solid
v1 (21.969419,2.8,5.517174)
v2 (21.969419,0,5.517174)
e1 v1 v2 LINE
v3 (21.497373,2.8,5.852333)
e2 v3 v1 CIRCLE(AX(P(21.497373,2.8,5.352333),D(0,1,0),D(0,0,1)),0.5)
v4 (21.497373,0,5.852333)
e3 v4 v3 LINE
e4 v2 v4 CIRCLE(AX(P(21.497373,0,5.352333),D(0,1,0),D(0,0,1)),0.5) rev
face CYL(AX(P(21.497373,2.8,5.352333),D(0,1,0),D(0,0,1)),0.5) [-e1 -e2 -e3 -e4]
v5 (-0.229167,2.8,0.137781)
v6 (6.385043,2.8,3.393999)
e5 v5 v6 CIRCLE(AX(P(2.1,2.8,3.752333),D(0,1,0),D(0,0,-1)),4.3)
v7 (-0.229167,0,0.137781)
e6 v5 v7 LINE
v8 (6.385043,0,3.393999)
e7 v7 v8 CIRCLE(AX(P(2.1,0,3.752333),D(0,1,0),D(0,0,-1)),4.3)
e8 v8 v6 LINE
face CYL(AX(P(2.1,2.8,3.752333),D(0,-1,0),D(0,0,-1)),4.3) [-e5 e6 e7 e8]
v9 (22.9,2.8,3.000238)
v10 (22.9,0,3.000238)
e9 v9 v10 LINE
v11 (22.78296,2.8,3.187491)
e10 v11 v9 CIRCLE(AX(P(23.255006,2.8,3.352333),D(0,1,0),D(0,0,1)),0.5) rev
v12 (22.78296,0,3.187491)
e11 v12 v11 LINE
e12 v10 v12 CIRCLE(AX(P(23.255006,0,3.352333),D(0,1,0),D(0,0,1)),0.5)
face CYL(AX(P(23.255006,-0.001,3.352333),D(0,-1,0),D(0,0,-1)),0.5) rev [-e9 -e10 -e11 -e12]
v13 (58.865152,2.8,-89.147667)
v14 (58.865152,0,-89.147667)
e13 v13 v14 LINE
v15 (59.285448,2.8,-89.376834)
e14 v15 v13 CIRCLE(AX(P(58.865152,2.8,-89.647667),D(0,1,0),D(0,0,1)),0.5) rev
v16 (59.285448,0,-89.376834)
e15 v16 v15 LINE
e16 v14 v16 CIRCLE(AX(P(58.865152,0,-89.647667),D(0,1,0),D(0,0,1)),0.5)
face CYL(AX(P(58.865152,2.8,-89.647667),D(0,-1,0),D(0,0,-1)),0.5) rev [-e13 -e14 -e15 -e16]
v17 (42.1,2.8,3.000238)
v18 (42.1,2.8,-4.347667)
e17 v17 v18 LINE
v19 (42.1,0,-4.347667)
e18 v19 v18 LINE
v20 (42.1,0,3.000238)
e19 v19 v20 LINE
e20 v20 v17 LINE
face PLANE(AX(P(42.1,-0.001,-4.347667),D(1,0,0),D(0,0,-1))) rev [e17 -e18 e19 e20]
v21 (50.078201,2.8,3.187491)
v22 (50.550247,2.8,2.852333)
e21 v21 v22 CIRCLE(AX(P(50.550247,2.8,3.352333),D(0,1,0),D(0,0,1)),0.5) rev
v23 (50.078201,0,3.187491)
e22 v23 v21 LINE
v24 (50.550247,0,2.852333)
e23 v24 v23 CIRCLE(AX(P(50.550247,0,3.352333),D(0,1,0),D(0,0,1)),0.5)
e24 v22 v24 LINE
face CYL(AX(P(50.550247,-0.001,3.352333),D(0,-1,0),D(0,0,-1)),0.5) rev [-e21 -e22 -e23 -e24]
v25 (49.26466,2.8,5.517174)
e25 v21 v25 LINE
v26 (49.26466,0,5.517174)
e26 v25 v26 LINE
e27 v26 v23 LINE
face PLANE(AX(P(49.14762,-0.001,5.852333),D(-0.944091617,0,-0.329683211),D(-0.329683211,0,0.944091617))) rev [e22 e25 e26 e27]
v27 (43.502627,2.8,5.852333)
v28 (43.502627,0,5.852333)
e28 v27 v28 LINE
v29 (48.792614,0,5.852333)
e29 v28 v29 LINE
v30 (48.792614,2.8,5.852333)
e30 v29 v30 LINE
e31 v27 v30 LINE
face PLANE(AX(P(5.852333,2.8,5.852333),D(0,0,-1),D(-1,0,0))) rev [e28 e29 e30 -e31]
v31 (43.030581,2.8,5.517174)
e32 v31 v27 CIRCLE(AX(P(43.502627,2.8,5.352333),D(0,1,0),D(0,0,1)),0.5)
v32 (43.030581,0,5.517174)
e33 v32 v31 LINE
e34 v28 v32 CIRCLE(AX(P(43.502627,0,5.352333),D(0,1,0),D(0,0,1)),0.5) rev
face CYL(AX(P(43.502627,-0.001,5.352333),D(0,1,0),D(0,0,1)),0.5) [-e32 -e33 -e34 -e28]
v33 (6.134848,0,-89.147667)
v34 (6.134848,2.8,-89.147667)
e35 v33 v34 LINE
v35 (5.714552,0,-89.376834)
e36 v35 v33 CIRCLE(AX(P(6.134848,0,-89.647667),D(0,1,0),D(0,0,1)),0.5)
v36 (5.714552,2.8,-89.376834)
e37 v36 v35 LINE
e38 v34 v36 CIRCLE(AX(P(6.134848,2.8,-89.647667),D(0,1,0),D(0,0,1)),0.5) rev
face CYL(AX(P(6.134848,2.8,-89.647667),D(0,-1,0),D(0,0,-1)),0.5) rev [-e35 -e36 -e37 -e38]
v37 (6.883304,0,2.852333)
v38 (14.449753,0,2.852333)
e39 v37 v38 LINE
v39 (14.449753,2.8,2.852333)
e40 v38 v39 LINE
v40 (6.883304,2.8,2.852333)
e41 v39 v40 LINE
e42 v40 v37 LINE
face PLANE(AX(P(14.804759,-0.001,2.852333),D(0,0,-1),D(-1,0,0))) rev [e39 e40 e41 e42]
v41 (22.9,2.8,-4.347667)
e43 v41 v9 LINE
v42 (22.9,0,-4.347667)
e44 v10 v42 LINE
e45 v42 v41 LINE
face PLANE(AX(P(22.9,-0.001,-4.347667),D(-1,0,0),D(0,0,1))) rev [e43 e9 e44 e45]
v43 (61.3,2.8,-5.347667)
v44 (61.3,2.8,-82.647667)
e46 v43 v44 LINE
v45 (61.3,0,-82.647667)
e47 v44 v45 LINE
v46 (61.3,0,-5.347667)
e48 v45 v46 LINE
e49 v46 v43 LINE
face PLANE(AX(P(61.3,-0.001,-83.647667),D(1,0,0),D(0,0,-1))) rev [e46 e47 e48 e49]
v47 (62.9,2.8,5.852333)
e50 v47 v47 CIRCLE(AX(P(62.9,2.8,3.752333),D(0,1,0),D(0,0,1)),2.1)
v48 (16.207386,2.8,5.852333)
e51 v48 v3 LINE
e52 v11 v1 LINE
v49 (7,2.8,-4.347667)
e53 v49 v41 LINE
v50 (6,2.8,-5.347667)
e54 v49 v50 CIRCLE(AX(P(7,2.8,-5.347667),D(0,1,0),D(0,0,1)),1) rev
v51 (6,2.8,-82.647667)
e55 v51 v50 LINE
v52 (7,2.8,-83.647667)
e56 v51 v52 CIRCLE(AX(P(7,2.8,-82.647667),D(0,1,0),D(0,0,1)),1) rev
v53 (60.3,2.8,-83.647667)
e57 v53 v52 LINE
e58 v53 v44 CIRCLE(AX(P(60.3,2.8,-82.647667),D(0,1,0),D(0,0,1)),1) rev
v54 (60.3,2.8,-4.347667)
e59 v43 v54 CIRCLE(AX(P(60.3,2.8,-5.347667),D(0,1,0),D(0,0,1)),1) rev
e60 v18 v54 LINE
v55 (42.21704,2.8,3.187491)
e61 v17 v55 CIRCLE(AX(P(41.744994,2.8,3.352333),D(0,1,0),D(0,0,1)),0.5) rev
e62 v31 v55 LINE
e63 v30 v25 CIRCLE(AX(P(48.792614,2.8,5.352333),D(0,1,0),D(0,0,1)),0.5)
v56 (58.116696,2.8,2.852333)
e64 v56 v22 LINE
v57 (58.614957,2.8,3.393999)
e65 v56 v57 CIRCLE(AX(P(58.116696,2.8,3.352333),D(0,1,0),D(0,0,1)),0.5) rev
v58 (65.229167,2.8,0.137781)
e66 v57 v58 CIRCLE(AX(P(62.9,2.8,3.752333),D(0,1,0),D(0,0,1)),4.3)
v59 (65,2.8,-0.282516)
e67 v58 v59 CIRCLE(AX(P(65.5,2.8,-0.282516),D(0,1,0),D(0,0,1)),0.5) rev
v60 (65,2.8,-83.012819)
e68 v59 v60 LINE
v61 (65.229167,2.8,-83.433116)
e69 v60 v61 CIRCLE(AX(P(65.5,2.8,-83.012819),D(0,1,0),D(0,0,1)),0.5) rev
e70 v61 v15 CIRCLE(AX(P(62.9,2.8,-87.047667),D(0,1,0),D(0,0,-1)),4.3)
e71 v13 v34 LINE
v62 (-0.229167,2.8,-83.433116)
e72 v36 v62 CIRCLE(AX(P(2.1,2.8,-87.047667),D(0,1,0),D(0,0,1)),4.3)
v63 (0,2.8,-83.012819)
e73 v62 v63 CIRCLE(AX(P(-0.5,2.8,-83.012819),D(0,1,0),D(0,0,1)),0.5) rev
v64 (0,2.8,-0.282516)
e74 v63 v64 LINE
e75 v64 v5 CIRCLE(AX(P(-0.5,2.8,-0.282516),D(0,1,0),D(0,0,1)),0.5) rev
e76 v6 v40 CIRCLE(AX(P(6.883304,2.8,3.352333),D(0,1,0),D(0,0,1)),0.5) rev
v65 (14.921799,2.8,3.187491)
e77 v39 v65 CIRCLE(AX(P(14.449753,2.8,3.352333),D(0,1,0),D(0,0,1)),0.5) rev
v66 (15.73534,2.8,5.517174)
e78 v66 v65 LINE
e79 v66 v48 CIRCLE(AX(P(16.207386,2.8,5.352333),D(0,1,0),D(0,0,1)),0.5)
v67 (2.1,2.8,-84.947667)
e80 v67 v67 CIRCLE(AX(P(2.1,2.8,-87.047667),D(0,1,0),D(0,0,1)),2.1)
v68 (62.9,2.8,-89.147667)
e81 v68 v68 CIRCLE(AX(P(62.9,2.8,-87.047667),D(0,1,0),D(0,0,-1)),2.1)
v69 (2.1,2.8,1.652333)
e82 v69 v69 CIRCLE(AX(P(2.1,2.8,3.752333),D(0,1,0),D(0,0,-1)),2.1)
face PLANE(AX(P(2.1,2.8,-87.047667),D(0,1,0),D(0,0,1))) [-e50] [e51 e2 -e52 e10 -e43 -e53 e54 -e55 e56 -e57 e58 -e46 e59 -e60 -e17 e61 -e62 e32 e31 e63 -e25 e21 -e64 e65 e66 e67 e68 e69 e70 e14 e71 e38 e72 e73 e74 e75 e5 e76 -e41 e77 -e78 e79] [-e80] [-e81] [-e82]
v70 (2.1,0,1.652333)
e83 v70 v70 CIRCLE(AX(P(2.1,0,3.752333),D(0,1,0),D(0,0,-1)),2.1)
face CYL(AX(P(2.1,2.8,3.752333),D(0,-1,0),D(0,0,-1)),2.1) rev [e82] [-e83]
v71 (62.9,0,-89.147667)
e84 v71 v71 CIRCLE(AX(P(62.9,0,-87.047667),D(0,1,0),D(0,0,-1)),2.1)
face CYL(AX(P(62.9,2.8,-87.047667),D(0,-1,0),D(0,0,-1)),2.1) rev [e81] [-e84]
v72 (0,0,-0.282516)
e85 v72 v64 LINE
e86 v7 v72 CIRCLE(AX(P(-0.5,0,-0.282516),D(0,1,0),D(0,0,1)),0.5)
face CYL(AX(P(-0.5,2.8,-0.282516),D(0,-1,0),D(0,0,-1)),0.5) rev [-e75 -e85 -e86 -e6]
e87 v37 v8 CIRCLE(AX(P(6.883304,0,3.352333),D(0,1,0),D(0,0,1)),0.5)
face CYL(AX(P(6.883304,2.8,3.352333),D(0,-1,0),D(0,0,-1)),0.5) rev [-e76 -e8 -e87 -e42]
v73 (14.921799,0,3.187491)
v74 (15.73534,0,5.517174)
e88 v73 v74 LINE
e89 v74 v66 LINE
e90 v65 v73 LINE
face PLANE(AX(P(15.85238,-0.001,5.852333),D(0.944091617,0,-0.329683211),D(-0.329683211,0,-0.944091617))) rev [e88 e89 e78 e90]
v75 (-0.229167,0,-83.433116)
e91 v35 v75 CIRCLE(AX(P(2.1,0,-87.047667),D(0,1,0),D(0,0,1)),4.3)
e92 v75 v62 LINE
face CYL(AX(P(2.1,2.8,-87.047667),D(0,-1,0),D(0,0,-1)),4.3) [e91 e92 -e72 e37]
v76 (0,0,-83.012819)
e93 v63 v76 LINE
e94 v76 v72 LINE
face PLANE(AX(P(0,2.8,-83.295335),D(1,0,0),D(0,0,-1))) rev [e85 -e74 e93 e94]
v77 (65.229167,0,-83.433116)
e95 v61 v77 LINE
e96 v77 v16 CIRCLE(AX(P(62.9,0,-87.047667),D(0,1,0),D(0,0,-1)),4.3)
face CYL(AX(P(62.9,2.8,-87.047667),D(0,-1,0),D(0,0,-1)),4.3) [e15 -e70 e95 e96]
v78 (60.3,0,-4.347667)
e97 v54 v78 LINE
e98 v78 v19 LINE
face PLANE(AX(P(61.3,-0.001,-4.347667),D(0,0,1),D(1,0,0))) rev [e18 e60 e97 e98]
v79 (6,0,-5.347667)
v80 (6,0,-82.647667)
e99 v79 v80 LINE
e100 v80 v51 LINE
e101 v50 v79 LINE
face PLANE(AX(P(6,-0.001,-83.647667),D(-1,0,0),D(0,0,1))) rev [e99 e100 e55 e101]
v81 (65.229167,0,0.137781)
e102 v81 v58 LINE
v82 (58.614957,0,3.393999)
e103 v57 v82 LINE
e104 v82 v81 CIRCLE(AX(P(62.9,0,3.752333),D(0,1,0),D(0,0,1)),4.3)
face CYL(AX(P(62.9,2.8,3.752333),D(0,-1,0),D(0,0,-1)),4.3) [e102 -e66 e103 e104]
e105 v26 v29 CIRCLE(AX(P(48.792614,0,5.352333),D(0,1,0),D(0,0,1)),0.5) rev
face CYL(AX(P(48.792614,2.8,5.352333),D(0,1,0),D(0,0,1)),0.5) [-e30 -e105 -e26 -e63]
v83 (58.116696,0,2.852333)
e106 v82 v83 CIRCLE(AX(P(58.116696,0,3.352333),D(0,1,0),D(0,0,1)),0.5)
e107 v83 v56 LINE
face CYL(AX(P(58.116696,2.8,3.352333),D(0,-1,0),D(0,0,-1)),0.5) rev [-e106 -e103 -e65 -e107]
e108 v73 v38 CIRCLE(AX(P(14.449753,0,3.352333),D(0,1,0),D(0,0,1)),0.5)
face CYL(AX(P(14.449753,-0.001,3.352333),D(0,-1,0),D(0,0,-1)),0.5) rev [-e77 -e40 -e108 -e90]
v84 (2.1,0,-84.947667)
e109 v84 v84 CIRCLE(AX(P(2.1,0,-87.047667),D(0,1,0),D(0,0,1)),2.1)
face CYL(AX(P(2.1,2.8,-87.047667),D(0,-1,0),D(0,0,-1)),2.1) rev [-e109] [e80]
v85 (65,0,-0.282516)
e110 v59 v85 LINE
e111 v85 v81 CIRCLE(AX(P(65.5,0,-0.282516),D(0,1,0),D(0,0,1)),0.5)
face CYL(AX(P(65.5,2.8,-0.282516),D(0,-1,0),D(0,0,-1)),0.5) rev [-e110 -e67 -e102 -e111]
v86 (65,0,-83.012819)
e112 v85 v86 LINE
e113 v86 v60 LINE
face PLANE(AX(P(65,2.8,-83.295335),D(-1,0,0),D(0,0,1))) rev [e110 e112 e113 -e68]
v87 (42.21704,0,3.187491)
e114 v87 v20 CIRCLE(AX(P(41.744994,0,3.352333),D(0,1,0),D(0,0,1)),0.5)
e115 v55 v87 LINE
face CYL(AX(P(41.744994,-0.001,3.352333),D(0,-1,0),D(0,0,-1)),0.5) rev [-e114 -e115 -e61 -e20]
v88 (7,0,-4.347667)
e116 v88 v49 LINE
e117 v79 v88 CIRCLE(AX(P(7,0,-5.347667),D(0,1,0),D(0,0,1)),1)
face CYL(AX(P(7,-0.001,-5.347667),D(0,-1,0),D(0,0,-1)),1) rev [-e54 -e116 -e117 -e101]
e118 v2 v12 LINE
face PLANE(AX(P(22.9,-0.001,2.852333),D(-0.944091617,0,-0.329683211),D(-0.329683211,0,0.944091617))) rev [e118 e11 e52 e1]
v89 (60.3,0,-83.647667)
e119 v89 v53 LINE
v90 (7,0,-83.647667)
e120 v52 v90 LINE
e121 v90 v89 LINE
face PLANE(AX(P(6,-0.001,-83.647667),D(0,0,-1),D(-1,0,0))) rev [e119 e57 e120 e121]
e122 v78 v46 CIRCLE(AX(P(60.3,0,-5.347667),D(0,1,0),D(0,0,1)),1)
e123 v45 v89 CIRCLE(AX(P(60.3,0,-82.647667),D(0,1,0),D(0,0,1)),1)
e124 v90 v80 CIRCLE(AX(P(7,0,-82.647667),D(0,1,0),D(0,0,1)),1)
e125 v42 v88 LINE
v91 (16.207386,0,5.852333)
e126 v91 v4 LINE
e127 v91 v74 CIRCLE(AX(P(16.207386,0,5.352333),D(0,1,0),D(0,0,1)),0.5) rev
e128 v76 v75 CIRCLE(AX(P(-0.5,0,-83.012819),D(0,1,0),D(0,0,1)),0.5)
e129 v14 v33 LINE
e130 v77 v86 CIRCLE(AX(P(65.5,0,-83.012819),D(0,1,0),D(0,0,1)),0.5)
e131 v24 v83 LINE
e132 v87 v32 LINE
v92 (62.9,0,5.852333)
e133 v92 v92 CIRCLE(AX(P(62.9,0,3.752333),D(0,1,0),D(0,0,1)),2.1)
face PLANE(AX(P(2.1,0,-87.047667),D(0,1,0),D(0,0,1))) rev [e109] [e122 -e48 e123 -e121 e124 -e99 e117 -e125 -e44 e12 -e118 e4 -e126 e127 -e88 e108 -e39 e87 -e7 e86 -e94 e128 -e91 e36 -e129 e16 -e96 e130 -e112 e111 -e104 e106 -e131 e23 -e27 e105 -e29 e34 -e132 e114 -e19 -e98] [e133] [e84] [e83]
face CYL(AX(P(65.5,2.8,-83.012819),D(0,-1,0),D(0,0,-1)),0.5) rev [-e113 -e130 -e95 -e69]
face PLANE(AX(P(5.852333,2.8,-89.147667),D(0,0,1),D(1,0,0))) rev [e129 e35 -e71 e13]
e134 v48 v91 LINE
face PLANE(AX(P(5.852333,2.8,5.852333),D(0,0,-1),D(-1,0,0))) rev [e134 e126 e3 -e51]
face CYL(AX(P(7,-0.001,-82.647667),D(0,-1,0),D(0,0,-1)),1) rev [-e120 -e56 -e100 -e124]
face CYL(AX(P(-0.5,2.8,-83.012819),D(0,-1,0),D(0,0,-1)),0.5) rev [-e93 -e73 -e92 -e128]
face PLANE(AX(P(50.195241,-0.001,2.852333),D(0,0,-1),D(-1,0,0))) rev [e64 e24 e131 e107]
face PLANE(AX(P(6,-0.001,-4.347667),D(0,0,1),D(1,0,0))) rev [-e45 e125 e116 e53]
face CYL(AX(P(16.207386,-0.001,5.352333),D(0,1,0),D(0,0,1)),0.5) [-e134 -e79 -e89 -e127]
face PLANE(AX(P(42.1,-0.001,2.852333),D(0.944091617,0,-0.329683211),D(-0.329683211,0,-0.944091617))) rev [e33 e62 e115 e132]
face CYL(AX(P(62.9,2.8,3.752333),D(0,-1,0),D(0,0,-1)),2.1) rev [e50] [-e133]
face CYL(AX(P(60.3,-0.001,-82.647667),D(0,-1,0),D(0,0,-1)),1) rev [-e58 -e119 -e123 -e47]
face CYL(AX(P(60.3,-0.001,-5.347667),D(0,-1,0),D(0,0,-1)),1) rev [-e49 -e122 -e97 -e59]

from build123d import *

# Parameters (mm, degrees)
BASEPLATE_OUTLINE_R = 2.1
BASEPLATE_DEPTH     = 2.8
CUT_EXTRUDE1_REACH  = 115.438
FILLET1_R           = 1


# Read off the part's stored shape, not the designer's step: BasePlate
with BuildPart() as part:
    # BasePlate outline → BasePlate (new body)
    with BuildSketch(Plane(origin=(0, 0, 0), x_dir=(1, 0, 0), z_dir=(0, 1, 0))):
        with BuildLine():
            Line((43.502626614, -5.852332608), (48.792614178, -5.852332608))
            ThreePointArc((48.792614178, -5.852332608), (49.082078508, -5.760021707), (49.264659986, -5.517174213))
            Line((49.264659986, -5.517174213), (50.078201202, -3.187491002))
            ThreePointArc((50.078201202, -3.187491002), (50.26078268, -2.944643509), (50.55024701, -2.852332608))
            Line((50.55024701, -2.852332608), (58.116695703, -2.852332608))
            ThreePointArc((58.116695703, -2.852332608), (58.484685739, -3.013831008), (58.614956567, -3.393999275))
            ThreePointArc((58.614956567, -3.393999275), (64.799237397, -7.61016844), (65.229166667, -0.137781095))
            ThreePointArc((65.229166667, -0.137781095), (65.061014427, 0.043158816), (65, 0.282515593))
            Line((65, 0.282515593), (65, 83.012819192))
            ThreePointArc((65, 83.012819192), (65.061014427, 83.252175969), (65.229166667, 83.433115879))
            ThreePointArc((65.229166667, 83.433115879), (65.940559159, 90.088226551), (59.285448487, 89.376834059))
            ThreePointArc((59.285448487, 89.376834059), (59.104508577, 89.208681819), (58.8651518, 89.147667392))
            Line((58.8651518, 89.147667392), (6.1348482, 89.147667392))
            ThreePointArc((6.1348482, 89.147667392), (5.895491423, 89.208681819), (5.714551513, 89.376834059))
            ThreePointArc((5.714551513, 89.376834059), (-0.940559159, 90.088226551), (-0.229166667, 83.433115879))
            ThreePointArc((-0.229166667, 83.433115879), (-0.061014427, 83.252175969), (0, 83.012819192))
            Line((0, 83.012819192), (0, 0.282515593))
            ThreePointArc((0, 0.282515593), (-0.061014427, 0.043158816), (-0.229166667, -0.137781095))
            ThreePointArc((-0.229166667, -0.137781095), (0.200762603, -7.61016844), (6.385043433, -3.393999275))
            ThreePointArc((6.385043433, -3.393999275), (6.515314261, -3.013831008), (6.883304297, -2.852332608))
            Line((6.883304297, -2.852332608), (14.44975299, -2.852332608))
            ThreePointArc((14.44975299, -2.852332608), (14.73921732, -2.944643509), (14.921798798, -3.187491002))
            Line((14.921798798, -3.187491002), (15.735340014, -5.517174213))
            ThreePointArc((15.735340014, -5.517174213), (15.917921492, -5.760021707), (16.207385822, -5.852332608))
            Line((16.207385822, -5.852332608), (21.497373386, -5.852332608))
            ThreePointArc((21.497373386, -5.852332608), (21.786837716, -5.760021707), (21.969419194, -5.517174213))
            Line((21.969419194, -5.517174213), (22.78296041, -3.187491002))
            ThreePointArc((22.78296041, -3.187491002), (22.965541888, -2.944643509), (23.255006218, -2.852332608))
            Line((23.255006218, -2.852332608), (41.744993782, -2.852332608))
            ThreePointArc((41.744993782, -2.852332608), (42.034458112, -2.944643509), (42.21703959, -3.187491002))
            Line((42.21703959, -3.187491002), (43.030580806, -5.517174213))
            ThreePointArc((43.030580806, -5.517174213), (43.213162284, -5.760021707), (43.502626614, -5.852332608))
        make_face()
        with Locations((2.1, -3.752332608)):
            Circle(BASEPLATE_OUTLINE_R, mode=Mode.SUBTRACT)
        with Locations((62.9, -3.752332608)):
            Circle(BASEPLATE_OUTLINE_R, mode=Mode.SUBTRACT)
        with Locations((2.1, 87.047667392)):
            Circle(BASEPLATE_OUTLINE_R, mode=Mode.SUBTRACT)
        with Locations((62.9, 87.047667392)):
            Circle(BASEPLATE_OUTLINE_R, mode=Mode.SUBTRACT)
    extrude(amount=BASEPLATE_DEPTH)

    # Sketch3 → Cut-Extrude1 (cut, up to next)
    with BuildSketch(Plane(origin=(0, 2.8, 0), x_dir=(1, 0, 0), z_dir=(0, 1, 0)), mode=Mode.PRIVATE) as cut_extrude1_sk1:
        Polygon((6, 83.647667392), (6, 4.347667392), (22.9, 4.347667392), (22.9, -3.00023804), (42.1, -3.00023804), (42.1, 4.347667392), (61.3, 4.347667392), (61.3, 83.647667392), align=None)
    cut_extrude1_tool1 = extrude(cut_extrude1_sk1.sketch, amount=-CUT_EXTRUDE1_REACH, mode=Mode.PRIVATE) & part.part
    add(cut_extrude1_tool1.solids().sort_by_distance((33.614156, 2.8, -42.647328))[0], mode=Mode.SUBTRACT)

    # Fillet1
    fillet1_edges = [part.edges().sort_by_distance(p)[0] for p in [
        (6, 1.4, -83.647667392),
        (61.3, 1.4, -83.647667392),
        (61.3, 1.4, -4.347667392),
        (6, 1.4, -4.347667392),
    ]]
    fillet(fillet1_edges, radius=FILLET1_R)


solid = part.part
